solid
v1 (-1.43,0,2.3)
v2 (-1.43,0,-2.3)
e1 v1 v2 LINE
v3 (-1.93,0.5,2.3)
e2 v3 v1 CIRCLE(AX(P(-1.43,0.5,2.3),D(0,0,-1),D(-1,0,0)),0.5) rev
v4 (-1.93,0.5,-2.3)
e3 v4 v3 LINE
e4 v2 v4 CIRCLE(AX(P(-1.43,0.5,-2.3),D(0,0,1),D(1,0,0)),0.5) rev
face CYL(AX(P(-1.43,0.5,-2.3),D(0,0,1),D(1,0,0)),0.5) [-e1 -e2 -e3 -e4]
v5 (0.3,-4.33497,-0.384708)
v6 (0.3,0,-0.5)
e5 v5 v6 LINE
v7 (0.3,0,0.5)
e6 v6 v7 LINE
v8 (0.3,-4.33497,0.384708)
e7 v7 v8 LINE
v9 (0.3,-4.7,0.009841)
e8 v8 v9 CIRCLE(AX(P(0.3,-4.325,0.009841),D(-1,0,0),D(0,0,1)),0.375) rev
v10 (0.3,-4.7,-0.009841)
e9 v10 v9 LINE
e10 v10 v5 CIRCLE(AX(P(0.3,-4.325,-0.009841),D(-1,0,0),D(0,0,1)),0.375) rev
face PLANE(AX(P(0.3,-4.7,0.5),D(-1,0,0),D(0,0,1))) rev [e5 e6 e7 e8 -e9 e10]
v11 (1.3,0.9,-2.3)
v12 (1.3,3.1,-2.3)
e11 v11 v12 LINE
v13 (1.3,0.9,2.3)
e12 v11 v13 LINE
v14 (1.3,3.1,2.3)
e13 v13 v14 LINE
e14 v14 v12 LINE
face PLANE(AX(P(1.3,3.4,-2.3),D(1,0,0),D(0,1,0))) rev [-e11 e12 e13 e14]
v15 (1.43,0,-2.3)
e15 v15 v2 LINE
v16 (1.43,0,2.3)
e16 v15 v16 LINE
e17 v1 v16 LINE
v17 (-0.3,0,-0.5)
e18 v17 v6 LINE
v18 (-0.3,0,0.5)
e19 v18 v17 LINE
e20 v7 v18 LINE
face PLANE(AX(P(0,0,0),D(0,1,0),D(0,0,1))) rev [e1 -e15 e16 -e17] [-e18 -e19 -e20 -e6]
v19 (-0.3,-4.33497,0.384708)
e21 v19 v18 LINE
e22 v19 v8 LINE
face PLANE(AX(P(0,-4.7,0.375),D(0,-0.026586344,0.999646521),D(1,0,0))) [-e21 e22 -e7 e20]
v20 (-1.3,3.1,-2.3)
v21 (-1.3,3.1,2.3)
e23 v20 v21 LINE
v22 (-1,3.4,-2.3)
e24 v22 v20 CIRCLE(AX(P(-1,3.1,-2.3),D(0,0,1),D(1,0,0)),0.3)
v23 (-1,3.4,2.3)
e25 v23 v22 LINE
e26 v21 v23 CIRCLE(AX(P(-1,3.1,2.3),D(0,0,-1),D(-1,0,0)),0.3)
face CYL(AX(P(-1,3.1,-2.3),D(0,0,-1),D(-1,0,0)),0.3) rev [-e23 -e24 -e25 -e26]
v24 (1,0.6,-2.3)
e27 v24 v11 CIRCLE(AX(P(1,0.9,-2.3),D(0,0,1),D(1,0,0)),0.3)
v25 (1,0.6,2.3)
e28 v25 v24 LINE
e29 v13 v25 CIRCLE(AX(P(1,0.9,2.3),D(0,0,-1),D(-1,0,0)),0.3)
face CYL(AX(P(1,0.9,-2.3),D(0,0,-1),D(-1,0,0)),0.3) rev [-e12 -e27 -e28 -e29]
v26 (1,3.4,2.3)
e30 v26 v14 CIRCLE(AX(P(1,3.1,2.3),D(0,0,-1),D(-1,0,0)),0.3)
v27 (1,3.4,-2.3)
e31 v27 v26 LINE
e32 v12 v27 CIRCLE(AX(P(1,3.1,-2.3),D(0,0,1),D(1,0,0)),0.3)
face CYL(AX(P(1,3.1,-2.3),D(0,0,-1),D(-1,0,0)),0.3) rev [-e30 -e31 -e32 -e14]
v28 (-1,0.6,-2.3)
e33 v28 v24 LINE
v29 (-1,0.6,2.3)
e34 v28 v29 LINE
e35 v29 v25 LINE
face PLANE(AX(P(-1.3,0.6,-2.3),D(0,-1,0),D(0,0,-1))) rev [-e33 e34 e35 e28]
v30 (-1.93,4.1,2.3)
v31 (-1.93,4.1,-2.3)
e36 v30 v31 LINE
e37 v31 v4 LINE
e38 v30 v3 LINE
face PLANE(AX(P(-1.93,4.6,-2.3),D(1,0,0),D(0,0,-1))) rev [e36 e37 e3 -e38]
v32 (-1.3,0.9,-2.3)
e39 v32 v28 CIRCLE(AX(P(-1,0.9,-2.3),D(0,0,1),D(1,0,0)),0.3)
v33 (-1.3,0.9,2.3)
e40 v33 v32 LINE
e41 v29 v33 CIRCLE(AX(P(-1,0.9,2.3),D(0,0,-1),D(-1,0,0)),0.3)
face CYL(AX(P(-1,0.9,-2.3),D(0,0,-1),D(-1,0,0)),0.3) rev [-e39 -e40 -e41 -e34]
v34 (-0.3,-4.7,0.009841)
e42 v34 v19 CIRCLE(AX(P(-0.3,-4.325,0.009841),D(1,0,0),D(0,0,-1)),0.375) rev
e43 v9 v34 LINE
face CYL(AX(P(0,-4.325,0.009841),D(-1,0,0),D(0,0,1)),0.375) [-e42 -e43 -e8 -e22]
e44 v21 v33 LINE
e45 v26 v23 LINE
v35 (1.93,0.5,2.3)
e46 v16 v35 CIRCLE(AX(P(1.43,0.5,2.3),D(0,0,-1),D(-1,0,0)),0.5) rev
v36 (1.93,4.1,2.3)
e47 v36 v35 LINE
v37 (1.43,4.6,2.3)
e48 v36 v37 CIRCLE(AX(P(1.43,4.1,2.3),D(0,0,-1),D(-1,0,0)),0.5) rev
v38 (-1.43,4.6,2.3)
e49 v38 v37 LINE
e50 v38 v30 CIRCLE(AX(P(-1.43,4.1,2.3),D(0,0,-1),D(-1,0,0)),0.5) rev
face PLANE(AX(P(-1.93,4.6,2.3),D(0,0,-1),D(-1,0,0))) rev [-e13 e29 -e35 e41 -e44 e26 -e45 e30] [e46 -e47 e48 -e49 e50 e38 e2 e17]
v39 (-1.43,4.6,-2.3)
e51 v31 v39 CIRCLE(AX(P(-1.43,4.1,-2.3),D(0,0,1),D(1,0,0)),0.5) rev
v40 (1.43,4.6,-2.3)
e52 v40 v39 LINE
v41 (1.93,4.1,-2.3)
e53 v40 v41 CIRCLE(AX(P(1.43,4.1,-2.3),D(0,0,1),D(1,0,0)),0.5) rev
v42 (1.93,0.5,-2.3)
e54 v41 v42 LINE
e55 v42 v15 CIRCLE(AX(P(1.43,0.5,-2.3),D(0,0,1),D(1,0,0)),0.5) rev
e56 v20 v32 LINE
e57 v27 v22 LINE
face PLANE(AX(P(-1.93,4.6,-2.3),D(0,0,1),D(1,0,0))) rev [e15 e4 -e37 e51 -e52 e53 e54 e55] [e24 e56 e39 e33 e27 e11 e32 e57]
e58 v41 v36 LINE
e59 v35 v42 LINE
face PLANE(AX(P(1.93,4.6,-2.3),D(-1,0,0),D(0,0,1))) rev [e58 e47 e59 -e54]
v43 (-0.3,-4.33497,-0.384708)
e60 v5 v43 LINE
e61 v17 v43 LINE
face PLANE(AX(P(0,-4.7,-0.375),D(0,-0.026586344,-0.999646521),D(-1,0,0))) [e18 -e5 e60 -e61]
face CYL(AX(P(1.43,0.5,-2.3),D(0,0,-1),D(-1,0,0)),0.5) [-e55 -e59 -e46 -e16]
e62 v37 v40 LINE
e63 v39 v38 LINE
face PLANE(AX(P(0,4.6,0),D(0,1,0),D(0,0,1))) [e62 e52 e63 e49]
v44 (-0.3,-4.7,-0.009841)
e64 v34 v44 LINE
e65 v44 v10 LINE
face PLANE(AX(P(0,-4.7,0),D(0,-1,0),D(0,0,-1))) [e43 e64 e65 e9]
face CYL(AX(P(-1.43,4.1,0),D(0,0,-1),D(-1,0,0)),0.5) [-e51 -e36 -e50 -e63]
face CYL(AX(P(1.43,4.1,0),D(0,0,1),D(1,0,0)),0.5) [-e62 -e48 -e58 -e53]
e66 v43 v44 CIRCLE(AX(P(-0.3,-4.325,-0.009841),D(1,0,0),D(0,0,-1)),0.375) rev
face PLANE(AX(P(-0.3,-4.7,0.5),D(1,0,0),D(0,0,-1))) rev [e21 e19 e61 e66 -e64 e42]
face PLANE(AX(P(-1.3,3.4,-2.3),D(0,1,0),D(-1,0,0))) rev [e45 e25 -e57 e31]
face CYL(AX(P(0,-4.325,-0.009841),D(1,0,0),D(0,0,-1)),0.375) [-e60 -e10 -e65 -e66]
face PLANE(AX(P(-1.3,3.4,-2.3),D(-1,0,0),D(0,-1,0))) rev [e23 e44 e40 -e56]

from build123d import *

# Parameters (mm, degrees)
SKETCH_1_W          = 3.86
SKETCH_1_H          = 4.6
EXTRUDE_1_DEPTH     = 4.6
SKETCH_2_W          = 2.6
SKETCH_2_H          = 2.8
CUT_EXTRUDE_1_DEPTH = 7.785639248
FILLET_1_R          = 0.5
FILLET_2_R          = 0.3
SKETCH_3_W          = 0.6
SKETCH_3_H          = 1
EXTRUDE_2_DEPTH     = 4.7
CHAMFER_1_SIZE      = 4.7
CHAMFER_1_SIZE_2    = 0.125
FILLET_4_R          = 0.375


with BuildPart() as part:
    # Эскиз1 → Бобышка-Вытянуть1 (new body)
    with BuildSketch(Plane(origin=(0, 0, 0), x_dir=(1, 0, 0), z_dir=(0, 1, 0))):
        Rectangle(SKETCH_1_W, SKETCH_1_H)
    extrude(amount=EXTRUDE_1_DEPTH)

    # Эскиз2 → Вырез-Вытянуть1 (cut, through all)
    with BuildSketch(Plane.XY.offset(2.3)):
        with Locations((0, 2)):
            Rectangle(SKETCH_2_W, SKETCH_2_H)
    extrude(amount=-CUT_EXTRUDE_1_DEPTH, mode=Mode.SUBTRACT)

    # Скругление1
    fillet_1_edges = [part.edges().sort_by_distance(p)[0] for p in [
        (1.93, 4.6, 0),
        (-1.93, 4.6, 0),
        (1.93, 0, 0),
        (-1.93, 0, 0),
    ]]
    fillet(fillet_1_edges, radius=FILLET_1_R)

    # Скругление2
    fillet_2_edges = [part.edges().sort_by_distance(p)[0] for p in [
        (-1.3, 0.6, 0),
        (-1.3, 3.4, 0),
        (1.3, 3.4, 0),
        (1.3, 0.6, 0),
    ]]
    fillet(fillet_2_edges, radius=FILLET_2_R)

    # Эскиз3 → Бобышка-Вытянуть2 (add)
    with BuildSketch(Plane.XZ):
        Rectangle(SKETCH_3_W, SKETCH_3_H)
    extrude(amount=EXTRUDE_2_DEPTH)

    # Фаска1
    # the kernel refuses this chamfer: 4.7, 0.125 mm, written as the material it takes off along each edge
    with BuildSketch(Plane(origin=(-12.519840253, -4.7, 0.5), x_dir=(0, 0.9999994771802269, 0.0010225650458134765), z_dir=(1, 0, 0))) as chamfer_1_piece_1_section:
        Polygon((CHAMFER_1_SIZE * 0.99999947718, -CHAMFER_1_SIZE * 0.00102256504581), (-CHAMFER_1_SIZE_2 * 0.00102256504581, -CHAMFER_1_SIZE_2 * 0.99999947718), (0, 0), align=None)
    chamfer_1_piece_1 = extrude(amount=25.039680507, mode=Mode.PRIVATE)
    chamfer_1_piece_1 = split(chamfer_1_piece_1, bisect_by=Plane(origin=(0, 0, 0.511194246), z_dir=(0, -1, 0)), keep=Keep.TOP, mode=Mode.PRIVATE)
    add(chamfer_1_piece_1, mode=Mode.SUBTRACT)
    with BuildSketch(Plane(origin=(12.519840253, -4.7, -0.5), x_dir=(0, 0.9999994771802269, -0.0010225650458134765), z_dir=(-1, 0, 0))) as chamfer_1_piece_2_section:
        Polygon((CHAMFER_1_SIZE * 0.99999947718, -CHAMFER_1_SIZE * 0.00102256504581), (-CHAMFER_1_SIZE_2 * 0.00102256504581, -CHAMFER_1_SIZE_2 * 0.99999947718), (0, 0), align=None)
    chamfer_1_piece_2 = extrude(amount=25.039680507, mode=Mode.PRIVATE)
    chamfer_1_piece_2 = split(chamfer_1_piece_2, bisect_by=Plane(origin=(0, 0, -0.511194246), z_dir=(0, -1, 0)), keep=Keep.TOP, mode=Mode.PRIVATE)
    add(chamfer_1_piece_2, mode=Mode.SUBTRACT)

    # Скругление4
    fillet_4_edges = [part.edges().sort_by_distance(p)[0] for p in [
        (0, -4.7, -0.375),
        (0, -4.7, 0.375),
    ]]
    fillet(fillet_4_edges, radius=FILLET_4_R)


solid = part.part
